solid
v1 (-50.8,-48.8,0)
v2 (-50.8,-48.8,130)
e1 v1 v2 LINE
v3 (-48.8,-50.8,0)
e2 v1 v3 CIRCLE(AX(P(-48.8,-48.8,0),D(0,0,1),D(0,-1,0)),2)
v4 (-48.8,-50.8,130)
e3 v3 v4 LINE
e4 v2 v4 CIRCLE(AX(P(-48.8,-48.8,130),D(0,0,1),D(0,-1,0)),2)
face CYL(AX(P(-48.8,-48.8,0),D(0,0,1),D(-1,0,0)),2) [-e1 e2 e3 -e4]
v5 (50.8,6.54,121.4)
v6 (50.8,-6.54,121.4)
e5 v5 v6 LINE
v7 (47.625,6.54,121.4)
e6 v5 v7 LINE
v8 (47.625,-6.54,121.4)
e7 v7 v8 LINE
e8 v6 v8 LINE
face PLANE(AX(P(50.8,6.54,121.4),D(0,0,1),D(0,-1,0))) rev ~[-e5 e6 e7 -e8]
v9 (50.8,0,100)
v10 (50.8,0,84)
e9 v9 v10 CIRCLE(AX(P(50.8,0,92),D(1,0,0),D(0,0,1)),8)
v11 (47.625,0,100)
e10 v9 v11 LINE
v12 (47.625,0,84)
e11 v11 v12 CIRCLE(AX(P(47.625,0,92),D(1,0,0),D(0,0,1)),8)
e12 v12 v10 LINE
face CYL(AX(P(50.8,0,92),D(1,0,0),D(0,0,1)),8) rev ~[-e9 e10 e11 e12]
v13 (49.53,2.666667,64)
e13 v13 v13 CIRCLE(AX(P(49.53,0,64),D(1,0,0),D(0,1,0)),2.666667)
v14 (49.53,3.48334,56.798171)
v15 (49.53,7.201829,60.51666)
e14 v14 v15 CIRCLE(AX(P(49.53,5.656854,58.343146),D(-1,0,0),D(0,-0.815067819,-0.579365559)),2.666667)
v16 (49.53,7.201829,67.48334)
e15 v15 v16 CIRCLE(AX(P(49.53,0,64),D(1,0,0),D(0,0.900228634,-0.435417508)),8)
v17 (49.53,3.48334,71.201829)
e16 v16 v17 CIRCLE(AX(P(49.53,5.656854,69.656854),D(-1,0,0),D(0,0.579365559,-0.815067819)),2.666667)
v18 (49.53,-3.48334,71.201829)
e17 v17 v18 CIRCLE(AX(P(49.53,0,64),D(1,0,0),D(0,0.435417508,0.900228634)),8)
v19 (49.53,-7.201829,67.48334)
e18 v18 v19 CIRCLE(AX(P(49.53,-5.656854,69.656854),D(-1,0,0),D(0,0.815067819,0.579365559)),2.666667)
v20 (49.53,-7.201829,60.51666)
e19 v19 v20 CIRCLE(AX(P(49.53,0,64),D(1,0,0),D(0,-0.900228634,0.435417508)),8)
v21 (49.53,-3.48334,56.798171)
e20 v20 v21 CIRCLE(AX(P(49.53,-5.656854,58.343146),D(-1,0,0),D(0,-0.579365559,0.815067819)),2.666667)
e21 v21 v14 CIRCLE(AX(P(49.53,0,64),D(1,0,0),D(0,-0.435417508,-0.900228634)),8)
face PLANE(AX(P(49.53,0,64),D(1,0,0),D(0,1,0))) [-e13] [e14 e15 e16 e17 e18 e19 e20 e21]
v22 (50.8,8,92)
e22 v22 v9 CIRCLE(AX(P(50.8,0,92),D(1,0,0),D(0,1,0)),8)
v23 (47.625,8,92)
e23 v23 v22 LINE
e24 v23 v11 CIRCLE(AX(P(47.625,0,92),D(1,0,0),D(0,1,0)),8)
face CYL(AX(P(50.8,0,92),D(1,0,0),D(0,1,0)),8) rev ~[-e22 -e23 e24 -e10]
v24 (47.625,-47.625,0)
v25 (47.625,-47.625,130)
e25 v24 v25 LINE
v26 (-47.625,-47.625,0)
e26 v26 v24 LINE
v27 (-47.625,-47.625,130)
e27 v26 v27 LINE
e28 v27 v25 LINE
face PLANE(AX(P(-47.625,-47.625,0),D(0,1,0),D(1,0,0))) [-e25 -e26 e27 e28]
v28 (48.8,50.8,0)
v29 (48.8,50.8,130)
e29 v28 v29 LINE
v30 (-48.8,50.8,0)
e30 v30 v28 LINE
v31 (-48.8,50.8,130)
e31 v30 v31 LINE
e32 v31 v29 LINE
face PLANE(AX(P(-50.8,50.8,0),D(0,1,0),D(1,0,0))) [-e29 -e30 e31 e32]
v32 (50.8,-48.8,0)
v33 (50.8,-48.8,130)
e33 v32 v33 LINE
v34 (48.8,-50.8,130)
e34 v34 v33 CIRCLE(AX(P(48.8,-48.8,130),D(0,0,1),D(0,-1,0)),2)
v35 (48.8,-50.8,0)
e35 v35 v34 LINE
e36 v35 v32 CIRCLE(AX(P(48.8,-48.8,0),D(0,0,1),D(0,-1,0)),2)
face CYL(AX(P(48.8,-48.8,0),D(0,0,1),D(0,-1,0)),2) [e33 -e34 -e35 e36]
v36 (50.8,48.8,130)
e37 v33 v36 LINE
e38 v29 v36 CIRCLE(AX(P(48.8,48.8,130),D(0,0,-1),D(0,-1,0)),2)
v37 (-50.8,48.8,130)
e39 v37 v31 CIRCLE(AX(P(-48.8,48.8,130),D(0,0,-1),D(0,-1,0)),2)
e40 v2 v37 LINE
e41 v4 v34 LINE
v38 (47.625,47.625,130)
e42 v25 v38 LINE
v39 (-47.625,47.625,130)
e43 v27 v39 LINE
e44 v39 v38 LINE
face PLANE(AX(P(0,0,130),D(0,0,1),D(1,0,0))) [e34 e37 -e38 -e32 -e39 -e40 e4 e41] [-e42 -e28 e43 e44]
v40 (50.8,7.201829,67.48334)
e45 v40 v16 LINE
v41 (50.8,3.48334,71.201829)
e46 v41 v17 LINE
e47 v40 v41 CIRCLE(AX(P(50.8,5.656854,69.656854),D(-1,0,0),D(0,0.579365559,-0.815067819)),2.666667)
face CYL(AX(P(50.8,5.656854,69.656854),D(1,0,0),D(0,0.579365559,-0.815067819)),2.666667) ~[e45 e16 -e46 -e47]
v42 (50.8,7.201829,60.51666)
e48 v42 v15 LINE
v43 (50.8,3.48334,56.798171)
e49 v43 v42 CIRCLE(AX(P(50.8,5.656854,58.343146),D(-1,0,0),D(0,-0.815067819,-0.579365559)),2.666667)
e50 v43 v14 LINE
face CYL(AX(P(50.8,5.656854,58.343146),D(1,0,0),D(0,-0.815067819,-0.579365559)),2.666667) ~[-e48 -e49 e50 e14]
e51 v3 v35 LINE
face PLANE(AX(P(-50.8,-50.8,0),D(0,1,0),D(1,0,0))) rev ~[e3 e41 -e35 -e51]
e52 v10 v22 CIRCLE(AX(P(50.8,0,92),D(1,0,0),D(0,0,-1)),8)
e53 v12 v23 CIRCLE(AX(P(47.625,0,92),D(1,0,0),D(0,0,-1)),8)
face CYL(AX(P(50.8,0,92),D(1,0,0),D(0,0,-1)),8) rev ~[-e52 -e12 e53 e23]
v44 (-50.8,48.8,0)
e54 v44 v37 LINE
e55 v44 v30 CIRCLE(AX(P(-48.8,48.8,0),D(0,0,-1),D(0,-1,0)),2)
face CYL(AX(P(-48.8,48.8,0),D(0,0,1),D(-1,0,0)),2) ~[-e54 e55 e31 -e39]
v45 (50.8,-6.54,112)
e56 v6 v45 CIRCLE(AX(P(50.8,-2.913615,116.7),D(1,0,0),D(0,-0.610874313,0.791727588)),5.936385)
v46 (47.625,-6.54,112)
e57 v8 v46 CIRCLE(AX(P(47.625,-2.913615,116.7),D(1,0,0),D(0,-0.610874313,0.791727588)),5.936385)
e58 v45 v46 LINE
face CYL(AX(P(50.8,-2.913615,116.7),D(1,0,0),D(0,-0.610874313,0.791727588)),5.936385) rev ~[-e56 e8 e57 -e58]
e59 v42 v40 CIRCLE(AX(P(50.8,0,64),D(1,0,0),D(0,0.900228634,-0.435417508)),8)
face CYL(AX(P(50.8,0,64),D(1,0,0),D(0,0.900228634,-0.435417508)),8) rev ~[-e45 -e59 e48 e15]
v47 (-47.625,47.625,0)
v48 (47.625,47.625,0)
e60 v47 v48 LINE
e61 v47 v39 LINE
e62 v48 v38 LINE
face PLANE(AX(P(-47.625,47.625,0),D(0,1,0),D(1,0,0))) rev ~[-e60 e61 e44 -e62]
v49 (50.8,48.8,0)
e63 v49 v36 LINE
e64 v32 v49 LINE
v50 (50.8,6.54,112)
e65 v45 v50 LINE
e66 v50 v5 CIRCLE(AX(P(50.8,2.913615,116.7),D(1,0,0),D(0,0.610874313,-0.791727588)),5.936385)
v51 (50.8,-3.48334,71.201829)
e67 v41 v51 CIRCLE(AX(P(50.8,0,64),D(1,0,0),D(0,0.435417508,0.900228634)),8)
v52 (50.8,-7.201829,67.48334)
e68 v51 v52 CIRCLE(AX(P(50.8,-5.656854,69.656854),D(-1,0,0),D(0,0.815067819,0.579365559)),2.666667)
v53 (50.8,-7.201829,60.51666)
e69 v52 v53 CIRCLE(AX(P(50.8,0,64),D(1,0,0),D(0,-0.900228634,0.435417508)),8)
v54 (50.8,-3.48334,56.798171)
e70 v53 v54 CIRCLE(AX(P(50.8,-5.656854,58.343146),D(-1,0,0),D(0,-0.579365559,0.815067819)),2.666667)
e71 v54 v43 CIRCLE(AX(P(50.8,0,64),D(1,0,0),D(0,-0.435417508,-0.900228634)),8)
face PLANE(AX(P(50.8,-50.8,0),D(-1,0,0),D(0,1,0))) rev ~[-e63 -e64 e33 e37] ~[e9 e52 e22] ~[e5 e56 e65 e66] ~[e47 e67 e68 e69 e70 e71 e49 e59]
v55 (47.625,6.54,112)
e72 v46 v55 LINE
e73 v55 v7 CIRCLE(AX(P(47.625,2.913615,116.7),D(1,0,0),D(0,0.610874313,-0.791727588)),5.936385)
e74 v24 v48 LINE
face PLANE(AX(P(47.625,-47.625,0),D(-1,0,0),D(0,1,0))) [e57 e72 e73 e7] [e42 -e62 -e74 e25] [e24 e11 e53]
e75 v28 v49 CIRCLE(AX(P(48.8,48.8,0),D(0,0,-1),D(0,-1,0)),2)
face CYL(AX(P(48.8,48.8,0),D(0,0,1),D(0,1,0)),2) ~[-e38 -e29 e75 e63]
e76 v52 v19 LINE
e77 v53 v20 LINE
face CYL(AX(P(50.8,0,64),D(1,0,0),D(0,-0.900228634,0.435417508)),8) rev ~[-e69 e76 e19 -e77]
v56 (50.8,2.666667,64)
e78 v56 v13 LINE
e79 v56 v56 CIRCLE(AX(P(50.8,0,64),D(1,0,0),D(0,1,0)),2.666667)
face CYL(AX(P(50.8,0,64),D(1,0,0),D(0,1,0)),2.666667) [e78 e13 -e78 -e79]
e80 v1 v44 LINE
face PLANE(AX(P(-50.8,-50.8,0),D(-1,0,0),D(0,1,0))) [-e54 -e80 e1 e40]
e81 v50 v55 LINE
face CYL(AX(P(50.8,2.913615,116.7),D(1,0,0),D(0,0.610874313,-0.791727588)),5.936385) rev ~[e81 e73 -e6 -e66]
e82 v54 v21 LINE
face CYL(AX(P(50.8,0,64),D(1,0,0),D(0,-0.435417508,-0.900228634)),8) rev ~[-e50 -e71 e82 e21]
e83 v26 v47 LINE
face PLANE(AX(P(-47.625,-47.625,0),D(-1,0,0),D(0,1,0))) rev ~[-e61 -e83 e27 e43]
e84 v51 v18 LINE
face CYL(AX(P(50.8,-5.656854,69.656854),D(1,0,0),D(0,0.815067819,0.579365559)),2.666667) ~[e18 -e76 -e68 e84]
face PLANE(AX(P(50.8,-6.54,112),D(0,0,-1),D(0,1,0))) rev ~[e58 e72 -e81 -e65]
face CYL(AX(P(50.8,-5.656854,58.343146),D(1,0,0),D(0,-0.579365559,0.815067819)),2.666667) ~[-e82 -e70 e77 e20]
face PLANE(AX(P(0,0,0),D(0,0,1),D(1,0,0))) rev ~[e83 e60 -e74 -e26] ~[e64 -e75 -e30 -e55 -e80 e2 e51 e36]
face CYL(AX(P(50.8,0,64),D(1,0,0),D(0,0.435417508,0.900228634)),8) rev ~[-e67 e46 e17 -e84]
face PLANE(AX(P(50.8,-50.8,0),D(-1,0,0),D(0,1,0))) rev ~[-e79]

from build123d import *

# Parameters (mm, degrees)
F0_W     = 101.6
F0_H     = 101.6
F0_W_2   = 95.25
F0_H_2   = 95.25
F1_DEPTH = 130
F2_R     = 2
F3_W     = 6.54
F3_H     = 9.4
F4_DEPTH = 3.175
F5_R     = 2.6666666667
F6_DEPTH = 1.27


# Not quite as in the source:
# - a length typed as a fraction of an inch, garbled in the dataset ("3 / 203.2 mm" for 3/8 in), is restored


with BuildPart() as f1:
    # F0 (on Top) → F1 (new body)
    with BuildSketch(Plane.XY):
        Rectangle(F0_W, F0_H)
        Rectangle(F0_W_2, F0_H_2, mode=Mode.SUBTRACT)
    extrude(amount=F1_DEPTH)

    # F2
    f2_edges = [f1.edges().sort_by_distance(p)[0] for p in [
        (50.8, 50.8, 65),
        (-50.8, 50.8, 65),
        (50.8, -50.8, 65),
        (-50.8, -50.8, 65),
    ]]
    fillet(f2_edges, radius=F2_R)

    # F3 (on face) → F4 (cut)
    with BuildSketch(Plane.YZ.offset(50.8)):
        with Locations((-3.27, 116.7)):
            Rectangle(F3_W, F3_H)
        with BuildLine():
            Line((-6.54, 112), (-6.54, 121.4))
            ThreePointArc((-6.54, 121.4), (-8.85, 116.7), (-6.54, 112))
        make_face()
        with Locations((3.27, 116.7)):
            Rectangle(F3_W, F3_H)
        with BuildLine():
            ThreePointArc((6.54, 112), (8.85, 116.7), (6.54, 121.4))
            Line((6.54, 121.4), (6.54, 112))
        make_face()
        with BuildLine():
            Line((0, 84), (0, 100))
            ThreePointArc((0, 100), (-8, 92), (0, 84))
        make_face()
        with BuildLine():
            ThreePointArc((8, 92), (5.6568542495, 97.6568542495), (0, 100))
            Line((0, 100), (0, 84))
            ThreePointArc((0, 84), (5.6568542495, 86.3431457505), (8, 92))
        make_face()
    extrude(amount=-F4_DEPTH, mode=Mode.SUBTRACT)

    # F5 (on face) → F6 (cut)
    with BuildSketch(Plane.YZ.offset(50.8)):
        with BuildLine():
            Line((0, 84), (0, 100))
            ThreePointArc((0, 100), (-8, 92), (0, 84))
        make_face()
        with BuildLine():
            ThreePointArc((8, 92), (5.6568542495, 97.6568542495), (0, 100))
            Line((0, 100), (0, 84))
            ThreePointArc((0, 84), (5.6568542495, 86.3431457505), (8, 92))
        make_face()
        with BuildLine():
            ThreePointArc((-3.4833400656, 71.2018290724), (-3.7712361663, 67.7712361663), (-7.2018290724, 67.4833400656))
            ThreePointArc((-7.2018290724, 67.4833400656), (-8, 64), (-7.2018290724, 60.5166599344))
            ThreePointArc((-7.2018290724, 60.5166599344), (-3.7712361663, 60.2287638337), (-3.4833400656, 56.7981709276))
            ThreePointArc((-3.4833400656, 56.7981709276), (0, 56), (3.4833400656, 56.7981709276))
            ThreePointArc((3.4833400656, 56.7981709276), (3.7712361663, 60.2287638337), (7.2018290724, 60.5166599344))
            ThreePointArc((7.2018290724, 60.5166599344), (8, 64), (7.2018290724, 67.4833400656))
            ThreePointArc((7.2018290724, 67.4833400656), (3.7712361663, 67.7712361663), (3.4833400656, 71.2018290724))
            ThreePointArc((3.4833400656, 71.2018290724), (0, 72), (-3.4833400656, 71.2018290724))
        make_face()
        with Locations((0, 64)):
            Circle(F5_R, mode=Mode.SUBTRACT)
    extrude(amount=-F6_DEPTH, mode=Mode.SUBTRACT)


solid = f1.part
